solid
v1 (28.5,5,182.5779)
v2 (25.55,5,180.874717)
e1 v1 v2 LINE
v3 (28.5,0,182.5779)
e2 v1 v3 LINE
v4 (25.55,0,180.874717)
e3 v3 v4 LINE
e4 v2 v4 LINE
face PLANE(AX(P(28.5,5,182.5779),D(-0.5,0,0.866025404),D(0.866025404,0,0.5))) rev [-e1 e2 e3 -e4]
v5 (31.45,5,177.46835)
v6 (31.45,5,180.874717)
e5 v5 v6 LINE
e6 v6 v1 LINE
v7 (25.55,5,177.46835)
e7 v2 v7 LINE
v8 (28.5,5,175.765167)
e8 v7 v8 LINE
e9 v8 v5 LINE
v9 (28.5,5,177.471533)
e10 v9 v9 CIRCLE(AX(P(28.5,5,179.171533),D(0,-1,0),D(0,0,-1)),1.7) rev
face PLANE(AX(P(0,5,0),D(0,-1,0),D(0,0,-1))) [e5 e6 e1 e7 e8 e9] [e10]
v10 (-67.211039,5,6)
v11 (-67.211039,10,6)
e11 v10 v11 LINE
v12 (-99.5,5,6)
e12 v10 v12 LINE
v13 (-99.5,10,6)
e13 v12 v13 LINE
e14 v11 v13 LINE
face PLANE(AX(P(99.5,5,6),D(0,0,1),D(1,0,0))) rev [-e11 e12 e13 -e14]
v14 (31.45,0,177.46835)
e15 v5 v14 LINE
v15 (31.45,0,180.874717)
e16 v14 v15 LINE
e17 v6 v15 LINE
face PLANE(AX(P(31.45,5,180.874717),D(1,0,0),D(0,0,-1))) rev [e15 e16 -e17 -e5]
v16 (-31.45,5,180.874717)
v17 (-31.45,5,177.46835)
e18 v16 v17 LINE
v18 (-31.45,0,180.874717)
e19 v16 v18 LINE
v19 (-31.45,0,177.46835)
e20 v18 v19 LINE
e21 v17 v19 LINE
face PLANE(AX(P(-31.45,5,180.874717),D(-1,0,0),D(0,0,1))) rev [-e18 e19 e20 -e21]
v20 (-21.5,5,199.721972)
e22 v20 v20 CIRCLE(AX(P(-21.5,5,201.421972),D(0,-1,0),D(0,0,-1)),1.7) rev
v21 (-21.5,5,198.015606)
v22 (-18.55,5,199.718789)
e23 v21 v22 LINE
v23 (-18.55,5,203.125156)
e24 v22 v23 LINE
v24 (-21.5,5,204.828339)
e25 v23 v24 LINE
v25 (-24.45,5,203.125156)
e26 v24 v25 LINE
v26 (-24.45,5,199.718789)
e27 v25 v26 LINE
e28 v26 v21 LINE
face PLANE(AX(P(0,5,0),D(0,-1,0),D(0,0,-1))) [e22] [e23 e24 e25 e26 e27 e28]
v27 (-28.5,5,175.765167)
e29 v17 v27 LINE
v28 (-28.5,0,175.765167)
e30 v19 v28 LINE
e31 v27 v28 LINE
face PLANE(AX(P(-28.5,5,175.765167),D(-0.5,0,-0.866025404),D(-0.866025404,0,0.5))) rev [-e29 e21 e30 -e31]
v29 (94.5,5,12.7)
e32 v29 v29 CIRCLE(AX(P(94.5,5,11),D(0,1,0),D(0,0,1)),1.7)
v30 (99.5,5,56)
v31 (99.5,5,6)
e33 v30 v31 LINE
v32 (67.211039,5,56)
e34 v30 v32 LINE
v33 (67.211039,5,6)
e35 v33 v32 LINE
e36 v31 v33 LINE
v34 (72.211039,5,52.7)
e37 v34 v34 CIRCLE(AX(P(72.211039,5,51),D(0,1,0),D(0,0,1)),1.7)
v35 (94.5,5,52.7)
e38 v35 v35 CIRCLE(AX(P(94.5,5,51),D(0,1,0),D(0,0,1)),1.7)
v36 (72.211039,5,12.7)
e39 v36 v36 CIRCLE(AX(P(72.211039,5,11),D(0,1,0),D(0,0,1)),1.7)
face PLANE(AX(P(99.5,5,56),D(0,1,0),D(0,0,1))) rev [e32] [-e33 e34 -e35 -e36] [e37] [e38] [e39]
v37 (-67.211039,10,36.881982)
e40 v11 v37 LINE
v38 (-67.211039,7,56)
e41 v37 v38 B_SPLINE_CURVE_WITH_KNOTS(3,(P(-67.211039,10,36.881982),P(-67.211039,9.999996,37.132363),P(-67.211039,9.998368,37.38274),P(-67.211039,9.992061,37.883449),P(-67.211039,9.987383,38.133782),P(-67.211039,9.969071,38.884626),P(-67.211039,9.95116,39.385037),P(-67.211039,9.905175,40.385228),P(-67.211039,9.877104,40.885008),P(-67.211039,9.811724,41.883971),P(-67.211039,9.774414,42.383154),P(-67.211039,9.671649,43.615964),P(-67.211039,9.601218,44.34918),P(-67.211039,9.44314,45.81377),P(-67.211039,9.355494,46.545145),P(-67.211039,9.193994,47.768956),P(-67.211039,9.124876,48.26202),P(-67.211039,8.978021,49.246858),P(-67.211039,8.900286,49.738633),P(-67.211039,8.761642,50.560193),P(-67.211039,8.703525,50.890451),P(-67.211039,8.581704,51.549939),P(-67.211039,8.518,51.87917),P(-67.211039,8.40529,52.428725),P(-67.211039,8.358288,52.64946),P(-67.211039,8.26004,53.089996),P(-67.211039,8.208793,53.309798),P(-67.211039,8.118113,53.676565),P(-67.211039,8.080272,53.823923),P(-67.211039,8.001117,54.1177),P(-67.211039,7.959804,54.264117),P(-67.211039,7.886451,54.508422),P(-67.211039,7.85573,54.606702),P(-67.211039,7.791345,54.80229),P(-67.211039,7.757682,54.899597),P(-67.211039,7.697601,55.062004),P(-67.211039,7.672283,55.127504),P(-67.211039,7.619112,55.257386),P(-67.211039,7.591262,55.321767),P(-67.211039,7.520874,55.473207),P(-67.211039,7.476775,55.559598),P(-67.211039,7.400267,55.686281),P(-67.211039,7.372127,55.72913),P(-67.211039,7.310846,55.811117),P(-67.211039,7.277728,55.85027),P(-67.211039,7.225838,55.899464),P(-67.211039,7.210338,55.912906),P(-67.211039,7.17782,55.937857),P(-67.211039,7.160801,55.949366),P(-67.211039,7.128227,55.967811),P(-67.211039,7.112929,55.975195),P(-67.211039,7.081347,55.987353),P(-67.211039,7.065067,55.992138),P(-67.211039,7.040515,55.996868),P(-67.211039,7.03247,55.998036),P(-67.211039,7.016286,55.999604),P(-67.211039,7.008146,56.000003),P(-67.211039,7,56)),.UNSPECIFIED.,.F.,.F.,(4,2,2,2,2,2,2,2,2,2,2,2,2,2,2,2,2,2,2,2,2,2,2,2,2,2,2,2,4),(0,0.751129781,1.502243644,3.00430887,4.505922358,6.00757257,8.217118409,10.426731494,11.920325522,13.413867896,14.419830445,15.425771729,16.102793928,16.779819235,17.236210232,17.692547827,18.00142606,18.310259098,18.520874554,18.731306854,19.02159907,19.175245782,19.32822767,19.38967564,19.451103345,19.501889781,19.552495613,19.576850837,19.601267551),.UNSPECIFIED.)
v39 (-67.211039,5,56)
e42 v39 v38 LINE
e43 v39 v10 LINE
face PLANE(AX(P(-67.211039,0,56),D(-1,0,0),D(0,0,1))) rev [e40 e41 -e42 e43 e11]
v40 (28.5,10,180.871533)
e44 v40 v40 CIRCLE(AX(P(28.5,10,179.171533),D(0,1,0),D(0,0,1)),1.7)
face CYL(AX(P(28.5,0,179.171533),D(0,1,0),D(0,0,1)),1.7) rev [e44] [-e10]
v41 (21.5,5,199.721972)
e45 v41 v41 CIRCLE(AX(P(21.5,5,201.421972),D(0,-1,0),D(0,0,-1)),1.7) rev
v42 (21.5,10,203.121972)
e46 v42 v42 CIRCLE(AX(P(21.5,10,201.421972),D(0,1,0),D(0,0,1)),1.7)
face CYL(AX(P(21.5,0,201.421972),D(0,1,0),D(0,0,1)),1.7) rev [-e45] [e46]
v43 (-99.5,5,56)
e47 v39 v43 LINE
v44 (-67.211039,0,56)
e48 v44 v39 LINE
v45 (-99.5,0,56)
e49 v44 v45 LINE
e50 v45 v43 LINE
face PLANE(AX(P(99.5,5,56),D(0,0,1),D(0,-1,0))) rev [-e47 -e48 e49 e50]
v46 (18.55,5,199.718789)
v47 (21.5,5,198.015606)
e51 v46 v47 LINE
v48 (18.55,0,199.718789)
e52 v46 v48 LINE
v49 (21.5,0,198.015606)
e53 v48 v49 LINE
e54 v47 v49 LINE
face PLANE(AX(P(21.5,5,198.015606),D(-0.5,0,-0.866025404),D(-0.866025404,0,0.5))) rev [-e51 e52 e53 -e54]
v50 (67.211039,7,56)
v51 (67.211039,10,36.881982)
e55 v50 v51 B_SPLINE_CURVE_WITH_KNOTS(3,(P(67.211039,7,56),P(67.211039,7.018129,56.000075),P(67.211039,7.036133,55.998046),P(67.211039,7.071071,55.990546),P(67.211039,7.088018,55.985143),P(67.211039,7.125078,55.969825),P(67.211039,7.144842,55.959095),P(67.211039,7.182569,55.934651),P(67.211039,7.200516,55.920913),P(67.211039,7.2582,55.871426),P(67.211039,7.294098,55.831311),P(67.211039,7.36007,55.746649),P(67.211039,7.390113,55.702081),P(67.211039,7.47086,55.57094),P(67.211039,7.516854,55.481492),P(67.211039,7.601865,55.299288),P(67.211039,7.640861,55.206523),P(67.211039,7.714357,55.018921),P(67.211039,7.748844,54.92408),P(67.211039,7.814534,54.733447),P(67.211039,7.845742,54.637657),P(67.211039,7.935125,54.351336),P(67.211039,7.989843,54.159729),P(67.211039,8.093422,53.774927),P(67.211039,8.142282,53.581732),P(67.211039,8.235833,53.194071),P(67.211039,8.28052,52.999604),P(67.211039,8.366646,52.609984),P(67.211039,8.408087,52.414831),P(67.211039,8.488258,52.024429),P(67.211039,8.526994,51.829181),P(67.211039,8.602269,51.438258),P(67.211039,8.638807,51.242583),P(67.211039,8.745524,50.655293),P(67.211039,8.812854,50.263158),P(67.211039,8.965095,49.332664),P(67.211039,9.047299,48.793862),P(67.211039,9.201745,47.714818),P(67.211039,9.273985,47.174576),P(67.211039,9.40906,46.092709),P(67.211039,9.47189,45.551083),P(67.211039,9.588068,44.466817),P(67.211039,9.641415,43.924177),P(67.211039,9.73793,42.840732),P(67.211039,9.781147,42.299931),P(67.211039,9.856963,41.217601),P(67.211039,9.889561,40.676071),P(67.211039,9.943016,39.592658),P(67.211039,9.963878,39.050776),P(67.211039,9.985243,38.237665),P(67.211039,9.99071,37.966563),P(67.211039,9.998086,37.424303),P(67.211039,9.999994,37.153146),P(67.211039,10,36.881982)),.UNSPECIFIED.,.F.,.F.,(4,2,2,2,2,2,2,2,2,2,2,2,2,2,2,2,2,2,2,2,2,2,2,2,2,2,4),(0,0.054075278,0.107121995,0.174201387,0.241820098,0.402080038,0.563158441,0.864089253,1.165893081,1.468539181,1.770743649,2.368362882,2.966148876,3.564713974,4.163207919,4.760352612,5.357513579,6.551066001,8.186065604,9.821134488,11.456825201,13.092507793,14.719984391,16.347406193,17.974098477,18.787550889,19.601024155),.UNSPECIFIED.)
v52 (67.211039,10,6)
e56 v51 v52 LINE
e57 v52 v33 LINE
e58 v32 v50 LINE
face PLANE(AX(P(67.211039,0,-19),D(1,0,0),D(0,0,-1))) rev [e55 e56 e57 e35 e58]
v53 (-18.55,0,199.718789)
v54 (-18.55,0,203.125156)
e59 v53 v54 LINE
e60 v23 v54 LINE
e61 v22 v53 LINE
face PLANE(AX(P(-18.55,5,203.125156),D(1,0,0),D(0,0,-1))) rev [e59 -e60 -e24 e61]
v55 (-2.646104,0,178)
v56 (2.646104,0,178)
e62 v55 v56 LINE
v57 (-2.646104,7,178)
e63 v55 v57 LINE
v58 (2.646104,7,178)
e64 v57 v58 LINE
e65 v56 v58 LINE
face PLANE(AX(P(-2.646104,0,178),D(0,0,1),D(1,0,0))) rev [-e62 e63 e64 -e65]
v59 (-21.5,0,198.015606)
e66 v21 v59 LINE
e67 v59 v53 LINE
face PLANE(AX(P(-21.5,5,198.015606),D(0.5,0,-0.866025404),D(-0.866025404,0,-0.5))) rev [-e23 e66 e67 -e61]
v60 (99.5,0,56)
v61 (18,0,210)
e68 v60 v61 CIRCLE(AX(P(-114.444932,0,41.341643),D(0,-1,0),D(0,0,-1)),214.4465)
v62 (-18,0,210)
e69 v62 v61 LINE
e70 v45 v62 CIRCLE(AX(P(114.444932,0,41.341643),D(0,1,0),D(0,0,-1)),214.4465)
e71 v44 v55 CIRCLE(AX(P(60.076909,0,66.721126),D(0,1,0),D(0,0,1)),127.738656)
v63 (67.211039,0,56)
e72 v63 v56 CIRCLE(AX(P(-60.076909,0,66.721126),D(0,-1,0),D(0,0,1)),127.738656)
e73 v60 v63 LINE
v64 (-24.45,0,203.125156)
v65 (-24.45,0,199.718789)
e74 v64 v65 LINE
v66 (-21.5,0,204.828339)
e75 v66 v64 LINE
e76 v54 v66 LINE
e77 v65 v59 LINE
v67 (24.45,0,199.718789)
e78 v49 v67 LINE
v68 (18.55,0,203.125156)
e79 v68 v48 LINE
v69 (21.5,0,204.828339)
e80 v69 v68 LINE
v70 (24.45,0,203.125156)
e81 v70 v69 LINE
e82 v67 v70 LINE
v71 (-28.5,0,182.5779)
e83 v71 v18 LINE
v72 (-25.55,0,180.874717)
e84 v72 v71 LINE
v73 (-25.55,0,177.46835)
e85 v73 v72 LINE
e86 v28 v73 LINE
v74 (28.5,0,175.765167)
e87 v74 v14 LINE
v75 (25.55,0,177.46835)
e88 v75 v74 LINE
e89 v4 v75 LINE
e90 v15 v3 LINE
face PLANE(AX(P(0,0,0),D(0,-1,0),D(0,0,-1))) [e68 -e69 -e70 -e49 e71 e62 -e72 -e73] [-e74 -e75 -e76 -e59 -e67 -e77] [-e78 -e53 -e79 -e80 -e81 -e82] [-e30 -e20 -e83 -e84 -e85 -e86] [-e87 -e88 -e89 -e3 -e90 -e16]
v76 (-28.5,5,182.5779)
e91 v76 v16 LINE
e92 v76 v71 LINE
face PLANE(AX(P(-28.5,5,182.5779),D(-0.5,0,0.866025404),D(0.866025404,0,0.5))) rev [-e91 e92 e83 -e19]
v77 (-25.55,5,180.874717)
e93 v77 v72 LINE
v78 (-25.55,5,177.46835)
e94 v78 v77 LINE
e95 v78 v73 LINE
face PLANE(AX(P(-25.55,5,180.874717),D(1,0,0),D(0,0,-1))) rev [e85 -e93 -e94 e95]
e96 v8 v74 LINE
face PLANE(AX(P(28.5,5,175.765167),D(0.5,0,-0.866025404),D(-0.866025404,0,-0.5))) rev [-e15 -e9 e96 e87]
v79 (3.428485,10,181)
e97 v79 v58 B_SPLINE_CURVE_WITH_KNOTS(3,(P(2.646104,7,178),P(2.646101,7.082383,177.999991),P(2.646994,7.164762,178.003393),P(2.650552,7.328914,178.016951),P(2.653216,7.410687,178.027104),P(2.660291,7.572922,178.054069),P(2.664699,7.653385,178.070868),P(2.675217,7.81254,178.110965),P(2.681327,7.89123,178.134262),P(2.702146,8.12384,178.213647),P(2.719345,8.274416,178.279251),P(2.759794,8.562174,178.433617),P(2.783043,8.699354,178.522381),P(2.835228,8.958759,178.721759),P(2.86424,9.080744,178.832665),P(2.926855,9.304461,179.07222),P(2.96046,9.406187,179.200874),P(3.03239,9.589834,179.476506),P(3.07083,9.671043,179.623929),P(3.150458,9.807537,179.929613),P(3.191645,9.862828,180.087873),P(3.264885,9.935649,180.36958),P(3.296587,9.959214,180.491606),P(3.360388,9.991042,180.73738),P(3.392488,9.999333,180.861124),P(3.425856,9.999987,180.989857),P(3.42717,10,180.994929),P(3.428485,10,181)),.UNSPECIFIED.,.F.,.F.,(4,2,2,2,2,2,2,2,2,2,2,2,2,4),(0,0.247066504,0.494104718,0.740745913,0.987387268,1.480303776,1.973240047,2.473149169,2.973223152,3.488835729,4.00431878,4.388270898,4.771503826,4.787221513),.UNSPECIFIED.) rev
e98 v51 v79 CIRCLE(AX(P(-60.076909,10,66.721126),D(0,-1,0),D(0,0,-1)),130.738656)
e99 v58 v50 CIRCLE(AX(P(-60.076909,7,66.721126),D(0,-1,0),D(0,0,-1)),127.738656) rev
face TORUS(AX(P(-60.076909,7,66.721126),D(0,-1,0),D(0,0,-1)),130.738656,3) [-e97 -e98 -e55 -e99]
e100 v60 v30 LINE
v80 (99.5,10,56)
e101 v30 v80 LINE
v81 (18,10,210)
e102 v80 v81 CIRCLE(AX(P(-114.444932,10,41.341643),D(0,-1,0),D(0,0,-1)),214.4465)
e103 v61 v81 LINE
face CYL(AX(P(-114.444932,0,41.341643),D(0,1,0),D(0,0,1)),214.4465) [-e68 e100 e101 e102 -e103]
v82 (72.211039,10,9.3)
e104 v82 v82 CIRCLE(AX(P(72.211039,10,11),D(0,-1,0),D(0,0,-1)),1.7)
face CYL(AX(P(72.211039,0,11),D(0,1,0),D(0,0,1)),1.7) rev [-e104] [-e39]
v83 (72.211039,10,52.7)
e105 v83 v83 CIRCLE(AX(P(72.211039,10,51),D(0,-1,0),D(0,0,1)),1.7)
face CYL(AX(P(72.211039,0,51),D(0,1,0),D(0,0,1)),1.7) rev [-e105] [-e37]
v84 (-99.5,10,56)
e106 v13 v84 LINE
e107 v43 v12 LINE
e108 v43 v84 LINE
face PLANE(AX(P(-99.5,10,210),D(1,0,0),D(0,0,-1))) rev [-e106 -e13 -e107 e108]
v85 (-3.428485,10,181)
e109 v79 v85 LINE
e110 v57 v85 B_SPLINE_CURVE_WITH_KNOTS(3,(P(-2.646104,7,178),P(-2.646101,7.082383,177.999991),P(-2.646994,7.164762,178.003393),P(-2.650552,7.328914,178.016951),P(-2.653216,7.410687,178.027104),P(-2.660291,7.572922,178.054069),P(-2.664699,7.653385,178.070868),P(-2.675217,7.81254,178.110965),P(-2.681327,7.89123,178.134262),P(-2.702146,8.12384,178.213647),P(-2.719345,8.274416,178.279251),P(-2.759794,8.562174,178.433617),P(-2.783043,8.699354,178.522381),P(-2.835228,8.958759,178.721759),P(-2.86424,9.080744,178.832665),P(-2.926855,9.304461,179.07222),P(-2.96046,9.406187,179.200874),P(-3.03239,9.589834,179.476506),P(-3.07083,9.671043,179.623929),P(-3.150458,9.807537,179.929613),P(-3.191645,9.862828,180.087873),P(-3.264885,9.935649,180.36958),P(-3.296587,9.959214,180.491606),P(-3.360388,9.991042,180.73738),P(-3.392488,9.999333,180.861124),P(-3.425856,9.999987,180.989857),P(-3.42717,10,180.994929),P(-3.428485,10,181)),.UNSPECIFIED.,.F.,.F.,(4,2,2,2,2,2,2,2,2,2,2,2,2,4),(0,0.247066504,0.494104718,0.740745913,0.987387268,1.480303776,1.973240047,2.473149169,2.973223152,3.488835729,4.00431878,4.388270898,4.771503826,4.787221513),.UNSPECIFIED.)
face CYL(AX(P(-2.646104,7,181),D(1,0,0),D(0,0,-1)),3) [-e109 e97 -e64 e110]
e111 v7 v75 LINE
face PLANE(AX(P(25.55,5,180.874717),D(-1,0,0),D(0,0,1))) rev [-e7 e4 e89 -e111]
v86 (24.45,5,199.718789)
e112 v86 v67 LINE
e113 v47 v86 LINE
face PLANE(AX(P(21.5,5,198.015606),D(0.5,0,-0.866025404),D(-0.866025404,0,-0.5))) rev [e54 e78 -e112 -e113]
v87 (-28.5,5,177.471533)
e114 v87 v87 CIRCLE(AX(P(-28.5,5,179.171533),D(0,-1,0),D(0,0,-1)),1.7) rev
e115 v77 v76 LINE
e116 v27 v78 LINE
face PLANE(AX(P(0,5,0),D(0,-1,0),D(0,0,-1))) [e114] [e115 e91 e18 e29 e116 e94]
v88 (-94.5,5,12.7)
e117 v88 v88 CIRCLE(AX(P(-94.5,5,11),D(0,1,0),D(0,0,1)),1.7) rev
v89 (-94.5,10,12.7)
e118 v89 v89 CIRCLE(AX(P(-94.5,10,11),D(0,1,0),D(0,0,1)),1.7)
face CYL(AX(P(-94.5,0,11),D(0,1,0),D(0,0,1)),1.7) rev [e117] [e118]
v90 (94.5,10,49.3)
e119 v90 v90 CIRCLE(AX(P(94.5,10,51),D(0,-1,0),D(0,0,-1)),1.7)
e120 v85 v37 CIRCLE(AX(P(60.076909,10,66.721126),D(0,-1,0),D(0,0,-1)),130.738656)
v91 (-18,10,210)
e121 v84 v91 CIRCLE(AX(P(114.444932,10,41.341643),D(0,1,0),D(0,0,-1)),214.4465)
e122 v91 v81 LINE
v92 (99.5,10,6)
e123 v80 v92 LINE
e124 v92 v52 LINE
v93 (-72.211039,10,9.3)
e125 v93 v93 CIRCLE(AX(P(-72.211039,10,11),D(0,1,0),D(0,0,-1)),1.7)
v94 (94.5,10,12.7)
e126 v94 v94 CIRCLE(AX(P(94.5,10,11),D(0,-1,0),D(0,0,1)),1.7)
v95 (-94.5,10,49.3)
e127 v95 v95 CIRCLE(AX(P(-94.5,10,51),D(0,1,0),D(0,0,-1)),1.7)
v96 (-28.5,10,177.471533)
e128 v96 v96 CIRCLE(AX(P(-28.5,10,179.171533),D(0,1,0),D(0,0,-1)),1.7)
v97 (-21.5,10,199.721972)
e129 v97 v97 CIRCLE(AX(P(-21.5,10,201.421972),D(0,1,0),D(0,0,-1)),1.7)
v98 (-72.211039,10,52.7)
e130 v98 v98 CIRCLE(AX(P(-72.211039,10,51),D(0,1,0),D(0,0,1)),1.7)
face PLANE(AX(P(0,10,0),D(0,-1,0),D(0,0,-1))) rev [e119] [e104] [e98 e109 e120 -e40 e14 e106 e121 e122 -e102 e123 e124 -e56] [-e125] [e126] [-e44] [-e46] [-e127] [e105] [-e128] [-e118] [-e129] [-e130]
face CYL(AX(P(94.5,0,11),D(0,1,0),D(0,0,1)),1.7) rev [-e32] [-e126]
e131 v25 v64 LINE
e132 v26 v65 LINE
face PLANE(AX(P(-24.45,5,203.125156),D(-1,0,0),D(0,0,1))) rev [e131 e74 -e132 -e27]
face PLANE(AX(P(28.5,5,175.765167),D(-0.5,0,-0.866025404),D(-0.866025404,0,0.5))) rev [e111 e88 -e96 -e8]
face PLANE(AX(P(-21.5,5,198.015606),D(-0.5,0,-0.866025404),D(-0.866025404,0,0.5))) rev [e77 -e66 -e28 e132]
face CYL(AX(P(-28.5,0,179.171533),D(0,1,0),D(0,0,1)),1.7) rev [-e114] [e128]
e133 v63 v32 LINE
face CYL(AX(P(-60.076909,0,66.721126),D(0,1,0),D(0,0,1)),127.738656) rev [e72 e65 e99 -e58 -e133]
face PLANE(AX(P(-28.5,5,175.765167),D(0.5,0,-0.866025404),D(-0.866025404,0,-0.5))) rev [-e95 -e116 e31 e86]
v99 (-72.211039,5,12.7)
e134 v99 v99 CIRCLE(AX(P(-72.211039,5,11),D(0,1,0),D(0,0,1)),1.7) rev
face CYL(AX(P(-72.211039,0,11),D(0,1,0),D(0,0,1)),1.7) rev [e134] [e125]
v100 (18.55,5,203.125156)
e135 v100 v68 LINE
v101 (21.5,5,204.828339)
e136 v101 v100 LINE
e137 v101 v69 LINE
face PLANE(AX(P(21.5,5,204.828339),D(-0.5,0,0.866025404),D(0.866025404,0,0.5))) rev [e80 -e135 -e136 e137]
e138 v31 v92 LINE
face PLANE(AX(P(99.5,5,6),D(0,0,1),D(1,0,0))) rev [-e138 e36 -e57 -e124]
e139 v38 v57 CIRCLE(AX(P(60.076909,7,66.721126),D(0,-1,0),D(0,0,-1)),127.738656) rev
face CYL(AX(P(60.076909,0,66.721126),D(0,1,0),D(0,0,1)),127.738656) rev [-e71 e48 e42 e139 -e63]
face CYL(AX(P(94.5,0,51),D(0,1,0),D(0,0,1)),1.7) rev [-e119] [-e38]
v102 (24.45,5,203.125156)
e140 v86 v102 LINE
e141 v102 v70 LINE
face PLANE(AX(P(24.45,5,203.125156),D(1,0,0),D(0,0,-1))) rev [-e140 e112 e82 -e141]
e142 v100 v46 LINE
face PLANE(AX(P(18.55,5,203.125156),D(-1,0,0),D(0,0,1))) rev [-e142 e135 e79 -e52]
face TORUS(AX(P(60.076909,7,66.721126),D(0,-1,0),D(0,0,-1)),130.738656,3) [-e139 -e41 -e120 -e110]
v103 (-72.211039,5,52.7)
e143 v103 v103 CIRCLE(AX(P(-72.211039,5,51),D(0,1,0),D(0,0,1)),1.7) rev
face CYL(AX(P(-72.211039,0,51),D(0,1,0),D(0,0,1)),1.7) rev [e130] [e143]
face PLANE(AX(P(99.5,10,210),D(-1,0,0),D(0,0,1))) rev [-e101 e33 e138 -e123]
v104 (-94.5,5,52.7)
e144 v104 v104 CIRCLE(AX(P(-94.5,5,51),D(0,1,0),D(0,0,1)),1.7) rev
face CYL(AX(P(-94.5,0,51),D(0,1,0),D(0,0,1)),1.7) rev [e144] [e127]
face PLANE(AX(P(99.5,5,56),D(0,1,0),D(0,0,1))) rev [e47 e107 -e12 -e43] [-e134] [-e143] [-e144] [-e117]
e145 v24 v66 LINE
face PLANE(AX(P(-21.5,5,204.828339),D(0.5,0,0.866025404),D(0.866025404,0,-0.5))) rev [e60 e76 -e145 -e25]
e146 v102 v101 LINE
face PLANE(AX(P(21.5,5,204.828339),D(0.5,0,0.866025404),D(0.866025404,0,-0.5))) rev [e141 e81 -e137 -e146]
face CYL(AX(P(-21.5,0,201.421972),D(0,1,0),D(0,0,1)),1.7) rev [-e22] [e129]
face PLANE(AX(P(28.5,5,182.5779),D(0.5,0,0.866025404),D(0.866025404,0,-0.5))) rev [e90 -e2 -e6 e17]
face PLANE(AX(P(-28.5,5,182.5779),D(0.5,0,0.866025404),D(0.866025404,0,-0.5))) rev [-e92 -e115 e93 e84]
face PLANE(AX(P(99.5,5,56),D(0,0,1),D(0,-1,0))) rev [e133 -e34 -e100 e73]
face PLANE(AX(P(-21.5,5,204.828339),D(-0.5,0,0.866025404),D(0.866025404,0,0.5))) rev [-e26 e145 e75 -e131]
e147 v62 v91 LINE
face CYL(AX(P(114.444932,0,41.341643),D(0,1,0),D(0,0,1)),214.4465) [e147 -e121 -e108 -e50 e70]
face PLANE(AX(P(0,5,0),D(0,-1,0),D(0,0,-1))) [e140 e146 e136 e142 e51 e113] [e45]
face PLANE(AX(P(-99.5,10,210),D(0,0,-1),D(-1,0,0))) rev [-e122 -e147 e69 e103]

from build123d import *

# Parameters (mm, degrees)
SKIZZE1_W                        = 199
SKIZZE1_H                        = 420
AUFSATZ_LINEAR_AUSTRAGEN1_DEPTH  = 10
SKIZZE5_W                        = 199
SKIZZE5_H                        = 85
SCHNITT_LINEAR_AUSTRAGEN2_DEPTH  = 10
SKIZZE20_R                       = 1.7
SCHNITT_LINEAR_AUSTRAGEN12_DEPTH = 233.594604409
SKIZZE21_W                       = 134.422077922
SKIZZE21_H                       = 75
SCHNITT_LINEAR_AUSTRAGEN13_DEPTH = 233.594604409
SCHNITT_LINEAR_AUSTRAGEN14_DEPTH = 233.594604409
AUFSATZ_LINEAR_AUSTRAGEN6_DEPTH  = 10
SKIZZE25_R                       = 1.7
SCHNITT_LINEAR_AUSTRAGEN15_DEPTH = 233.594604409
SCHNITT_LINEAR_AUSTRAGEN16_DEPTH = 290.484023739
VERRUNDUNG1_R                    = 3
SKIZZE27_R                       = 1.7
SCHNITT_LINEAR_AUSTRAGEN17_DEPTH = 233.594604409
SCHNITT_LINEAR_AUSTRAGEN18_DEPTH = 5


with BuildPart() as part:
    # Skizze1 → Aufsatz-Linear austragen1 (new body)
    with BuildSketch(Plane(origin=(0, 0, 0), x_dir=(1, 0, 0), z_dir=(0, 1, 0))):
        Rectangle(SKIZZE1_W, SKIZZE1_H)
    extrude(amount=AUFSATZ_LINEAR_AUSTRAGEN1_DEPTH)

    # Skizze5 → Schnitt-Linear austragen2 (cut)
    with BuildSketch(Plane(origin=(0, 10, 0), x_dir=(1, 0, 0), z_dir=(0, 1, 0))):
        Polygon((99.5, -210), (18, -210), (99.5, -56), align=None)
        Polygon((-18, -210), (-99.5, -56), (-99.5, -210), align=None)
        with Locations((0, 167.5)):
            Rectangle(SKIZZE5_W, SKIZZE5_H)
        Polygon((67.211038961, -56), (-67.211038961, -56), (-2.646103896, -178), (2.646103896, -178), align=None)
    extrude(amount=-SCHNITT_LINEAR_AUSTRAGEN2_DEPTH, mode=Mode.SUBTRACT)

    # Skizze20 → Schnitt-Linear austragen12 (cut, through all)
    with BuildSketch(Plane(origin=(0, 10, 0), x_dir=(1, 0, 0), z_dir=(0, 1, 0))):
        with Locations(Location((90.5, 119.52, 0), (0, 0, 270))):
            Circle(SKIZZE20_R)
        with Locations(Location((48.5, 119.52, 0), (0, 0, 270))):
            Circle(SKIZZE20_R)
        with Locations(Location((-48.5, 119.52, 0), (0, 0, 90))):
            Circle(SKIZZE20_R)
        with Locations(Location((-90.5, 119.52, 0), (0, 0, 90))):
            Circle(SKIZZE20_R)
        with Locations(Location((87, 43.82, 0), (0, 0, 270))):
            Circle(SKIZZE20_R)
        with Locations(Location((52, 43.82, 0), (0, 0, 270))):
            Circle(SKIZZE20_R)
        with Locations(Location((-87, 43.82, 0), (0, 0, 90))):
            Circle(SKIZZE20_R)
        with Locations(Location((-52, 43.82, 0), (0, 0, 90))):
            Circle(SKIZZE20_R)
    extrude(amount=-SCHNITT_LINEAR_AUSTRAGEN12_DEPTH, mode=Mode.SUBTRACT)

    # Skizze21 → Schnitt-Linear austragen13 (cut, through all)
    with BuildSketch(Plane(origin=(0, 10, 0), x_dir=(1, 0, 0), z_dir=(0, 1, 0))):
        with Locations((0, -18.5)):
            Rectangle(SKIZZE21_W, SKIZZE21_H)
    extrude(amount=-SCHNITT_LINEAR_AUSTRAGEN13_DEPTH, mode=Mode.SUBTRACT)

    # Skizze22 → Schnitt-Linear austragen14 (cut, through all)
    with BuildSketch(Plane(origin=(0, 10, 0), x_dir=(1, 0, 0), z_dir=(0, 1, 0))):
        with BuildLine():
            Line((-67.211038961, -56), (-2.646103896, -178))
            ThreePointArc((-2.646103896, -178), (-52.825886854, -126.471631215), (-67.211038961, -56))
        make_face()
    schnitt_linear_austragen14 = extrude(amount=-SCHNITT_LINEAR_AUSTRAGEN14_DEPTH, mode=Mode.SUBTRACT)

    # Skizze23 → Aufsatz-Linear austragen6 (add)
    with BuildSketch(Plane(origin=(0, 10, 0), x_dir=(1, 0, 0), z_dir=(0, 1, 0))):
        with BuildLine():
            Line((-99.5, -56), (-18, -210))
            ThreePointArc((-18, -210), (-75.095260266, -141.650251374), (-99.5, -56))
        make_face()
    aufsatz_linear_austragen6 = extrude(amount=-AUFSATZ_LINEAR_AUSTRAGEN6_DEPTH)

    # Spiegeln2: Schnitt-Linear austragen14, Aufsatz-Linear austragen6 across plane
    add(schnitt_linear_austragen14.mirror(Plane(origin=(0, 0, 0), x_dir=(0, 0, 1), z_dir=(1, 0, 0))), mode=Mode.SUBTRACT)
    add(aufsatz_linear_austragen6.mirror(Plane(origin=(0, 0, 0), x_dir=(0, 0, 1), z_dir=(1, 0, 0))))

    # Skizze25 → Schnitt-Linear austragen15 (cut, through all)
    with BuildSketch(Plane(origin=(0, 10, 0), x_dir=(1, 0, 0), z_dir=(0, 1, 0))):
        with Locations(Location((-94.5, -11, 0), (0, 0, 270))):
            Circle(SKIZZE25_R)
        with Locations(Location((-72.211038961, -11, 0), (0, 0, 90))):
            Circle(SKIZZE25_R)
        with Locations(Location((-72.211038961, -51, 0), (0, 0, 270))):
            Circle(SKIZZE25_R)
        with Locations(Location((-94.5, -51, 0), (0, 0, 90))):
            Circle(SKIZZE25_R)
    schnitt_linear_austragen15 = extrude(amount=-SCHNITT_LINEAR_AUSTRAGEN15_DEPTH, mode=Mode.SUBTRACT)

    # Spiegeln3: Schnitt-Linear austragen15 across plane
    add(schnitt_linear_austragen15.mirror(Plane(origin=(0, 0, 0), x_dir=(0, 0, 1), z_dir=(1, 0, 0))), mode=Mode.SUBTRACT)

    # Skizze26 → Schnitt-Linear austragen16 (cut, through all)
    with BuildSketch(Plane.ZY.offset(99.5)):
        Polygon((56, 5), (56, 0), (4.196805737, -14.401746423), (-137.707729511, -14.401746423), (-137.707729511, 19.508660812), (5.012761814, 19.508660812), (6, 10), (6, 5), align=None)
    extrude(amount=-SCHNITT_LINEAR_AUSTRAGEN16_DEPTH, mode=Mode.SUBTRACT)

    # Verrundung1
    # the kernel refuses this fillet: 3 mm, written as the material it takes off along each edge
    with BuildSketch(Plane(origin=(60.076908998, 10, 66.721125619), x_dir=(-0.4390500946900349, 0, 0.8984625837243705), z_dir=(0.8984625837243705, 0, 0.4390500946900349))) as verrundung1_piece_1_section:
        with BuildLine():
            CenterArc((127.738655974 + VERRUNDUNG1_R, VERRUNDUNG1_R), VERRUNDUNG1_R, 180, 90)
            Line((127.738655974, VERRUNDUNG1_R), (127.738655974, 0))
            Line((127.738655974, 0), (127.738655974 + VERRUNDUNG1_R, 0))
        make_face()
    verrundung1_piece_1 = revolve(axis=Axis((60.076908998, 10, 66.721125619), (0, -1, 0)), revolution_arc=78.865488706, mode=Mode.PRIVATE)
    verrundung1_piece_1 = split(verrundung1_piece_1, bisect_by=Plane(origin=(60.076908998, 10, 178), z_dir=(0, 0, -1)), keep=Keep.TOP, mode=Mode.PRIVATE)
    add(verrundung1_piece_1, mode=Mode.SUBTRACT)
    with BuildSketch(Plane(origin=(-60.076908998, 10, 66.721125619), x_dir=(0.4390500946900349, 0, 0.8984625837243705), z_dir=(-0.8984625837243705, 0, 0.4390500946900349))) as verrundung1_piece_2_section:
        with BuildLine():
            CenterArc((127.738655974 + VERRUNDUNG1_R, -VERRUNDUNG1_R), VERRUNDUNG1_R, 90, 90)
            Line((127.738655974, -VERRUNDUNG1_R), (127.738655974, 0))
            Line((127.738655974, 0), (127.738655974 + VERRUNDUNG1_R, 0))
        make_face()
    verrundung1_piece_2 = revolve(axis=Axis((-60.076908998, 10, 66.721125619), (0, 1, 0)), revolution_arc=78.865488706, mode=Mode.PRIVATE)
    verrundung1_piece_2 = split(verrundung1_piece_2, bisect_by=Plane(origin=(-60.076908998, 10, 178), z_dir=(0, 0, -1)), keep=Keep.TOP, mode=Mode.PRIVATE)
    add(verrundung1_piece_2, mode=Mode.SUBTRACT)
    with BuildSketch(Plane(origin=(-10.146103896, 10, 178), x_dir=(0, 0, 1), z_dir=(1, 0, 0))) as verrundung1_piece_3_section:
        with BuildLine():
            CenterArc((VERRUNDUNG1_R, VERRUNDUNG1_R), VERRUNDUNG1_R, 180, 90)
            Line((0, VERRUNDUNG1_R), (0, 0))
            Line((0, 0), (VERRUNDUNG1_R, 0))
        make_face()
    verrundung1_piece_3 = extrude(amount=20.292207792, mode=Mode.PRIVATE)
    verrundung1_piece_3 = verrundung1_piece_3 & Plane(origin=(60.076908998, 10, 66.721125619), x_dir=(-0.4910260908528423, 0, 0.8711448663120137), z_dir=(0, 1, 0)) * Cylinder(127.738655974, 53, mode=Mode.PRIVATE)
    verrundung1_piece_3 = verrundung1_piece_3 & Plane(origin=(-60.076908998, 10, 66.721125619), x_dir=(0.4910260908528423, 0, 0.8711448663120137), z_dir=(0, 1, 0)) * Cylinder(127.738655974, 53, mode=Mode.PRIVATE)
    add(verrundung1_piece_3, mode=Mode.SUBTRACT)
    with BuildSketch(Plane(origin=(-10.146103896, 10, 178), x_dir=(0, 0, 1), z_dir=(1, 0, 0))) as verrundung1_piece_4_section:
        with BuildLine():
            CenterArc((VERRUNDUNG1_R, VERRUNDUNG1_R), VERRUNDUNG1_R, 180, 90)
            Line((0, VERRUNDUNG1_R), (0, 0))
            Line((0, 0), (VERRUNDUNG1_R, 0))
        make_face()
    verrundung1_piece_4 = extrude(amount=20.292207792, mode=Mode.PRIVATE)
    verrundung1_piece_4 = verrundung1_piece_4 - Plane(origin=(60.076908998, 10, 66.721125619), x_dir=(-0.4910260908528423, 0, 0.8711448663120137), z_dir=(0, 1, 0)) * Cylinder(127.738655974, 53, mode=Mode.PRIVATE)
    verrundung1_piece_4 = verrundung1_piece_4 - Plane(origin=(-60.076908998, 10, 66.721125619), x_dir=(0.4910260908528423, 0, 0.8711448663120137), z_dir=(0, 1, 0)) * Cylinder(127.738655974, 53, mode=Mode.PRIVATE)
    add(verrundung1_piece_4, mode=Mode.SUBTRACT)
    with BuildSketch(Plane(origin=(60.076908998, 10, 66.721125619), x_dir=(-0.4390500946900349, 0, 0.8984625837243705), z_dir=(0.8984625837243705, 0, 0.4390500946900349))) as verrundung1_piece_5a_section:
        with BuildLine():
            CenterArc((127.738655974 + VERRUNDUNG1_R, VERRUNDUNG1_R), VERRUNDUNG1_R, 180, 90)
            Line((127.738655974, VERRUNDUNG1_R), (127.738655974, 0))
            Line((127.738655974, 0), (127.738655974 + VERRUNDUNG1_R, 0))
        make_face()
    verrundung1_piece_5a = revolve(axis=Axis((60.076908998, 10, 66.721125619), (0, -1, 0)), revolution_arc=78.865488706, mode=Mode.PRIVATE)
    verrundung1_piece_5a = split(verrundung1_piece_5a, bisect_by=Plane(origin=(60.076908998, 10, 178), z_dir=(0, 0, 1)), keep=Keep.TOP, mode=Mode.PRIVATE)
    with BuildSketch(Plane(origin=(-10.146103896, 10, 178), x_dir=(0, 0, 1), z_dir=(1, 0, 0))) as verrundung1_piece_5b_section:
        with BuildLine():
            CenterArc((VERRUNDUNG1_R, VERRUNDUNG1_R), VERRUNDUNG1_R, 180, 90)
            Line((0, VERRUNDUNG1_R), (0, 0))
            Line((0, 0), (VERRUNDUNG1_R, 0))
        make_face()
    verrundung1_piece_5b = extrude(amount=20.292207792, mode=Mode.PRIVATE)
    verrundung1_piece_5b = verrundung1_piece_5b - Plane(origin=(60.076908998, 10, 66.721125619), x_dir=(-0.4910260908528423, 0, 0.8711448663120137), z_dir=(0, 1, 0)) * Cylinder(127.738655974, 53, mode=Mode.PRIVATE)
    verrundung1_piece_5b = verrundung1_piece_5b & Plane(origin=(-60.076908998, 10, 66.721125619), x_dir=(0.4910260908528423, 0, 0.8711448663120137), z_dir=(0, 1, 0)) * Cylinder(127.738655974, 53, mode=Mode.PRIVATE)
    verrundung1_piece_5 = verrundung1_piece_5a & verrundung1_piece_5b
    add(verrundung1_piece_5, mode=Mode.SUBTRACT)
    with BuildSketch(Plane(origin=(-10.146103896, 10, 178), x_dir=(0, 0, 1), z_dir=(1, 0, 0))) as verrundung1_piece_6a_section:
        with BuildLine():
            CenterArc((VERRUNDUNG1_R, VERRUNDUNG1_R), VERRUNDUNG1_R, 180, 90)
            Line((0, VERRUNDUNG1_R), (0, 0))
            Line((0, 0), (VERRUNDUNG1_R, 0))
        make_face()
    verrundung1_piece_6a = extrude(amount=20.292207792, mode=Mode.PRIVATE)
    verrundung1_piece_6a = verrundung1_piece_6a & Plane(origin=(60.076908998, 10, 66.721125619), x_dir=(-0.4910260908528423, 0, 0.8711448663120137), z_dir=(0, 1, 0)) * Cylinder(127.738655974, 53, mode=Mode.PRIVATE)
    verrundung1_piece_6a = verrundung1_piece_6a - Plane(origin=(-60.076908998, 10, 66.721125619), x_dir=(0.4910260908528423, 0, 0.8711448663120137), z_dir=(0, 1, 0)) * Cylinder(127.738655974, 53, mode=Mode.PRIVATE)
    with BuildSketch(Plane(origin=(-60.076908998, 10, 66.721125619), x_dir=(0.4390500946900349, 0, 0.8984625837243705), z_dir=(-0.8984625837243705, 0, 0.4390500946900349))) as verrundung1_piece_6b_section:
        with BuildLine():
            CenterArc((127.738655974 + VERRUNDUNG1_R, -VERRUNDUNG1_R), VERRUNDUNG1_R, 90, 90)
            Line((127.738655974, -VERRUNDUNG1_R), (127.738655974, 0))
            Line((127.738655974, 0), (127.738655974 + VERRUNDUNG1_R, 0))
        make_face()
    verrundung1_piece_6b = revolve(axis=Axis((-60.076908998, 10, 66.721125619), (0, 1, 0)), revolution_arc=78.865488706, mode=Mode.PRIVATE)
    verrundung1_piece_6b = split(verrundung1_piece_6b, bisect_by=Plane(origin=(-60.076908998, 10, 178), z_dir=(0, 0, 1)), keep=Keep.TOP, mode=Mode.PRIVATE)
    verrundung1_piece_6 = verrundung1_piece_6a & verrundung1_piece_6b
    add(verrundung1_piece_6, mode=Mode.SUBTRACT)

    # Skizze27 → Schnitt-Linear austragen17 (cut, through all)
    with BuildSketch(Plane(origin=(0, 10, 0), x_dir=(1, 0, 0), z_dir=(0, 1, 0))):
        with Locations(Location((28.5, -179.171533214, 0), (0, 0, 270))):
            Circle(SKIZZE27_R)
        with Locations(Location((21.5, -201.421972318, 0), (0, 0, 270))):
            Circle(SKIZZE27_R)
        with Locations(Location((-21.5, -201.421972318, 0), (0, 0, 90))):
            Circle(SKIZZE27_R)
        with Locations(Location((-28.5, -179.171533214, 0), (0, 0, 90))):
            Circle(SKIZZE27_R)
    extrude(amount=-SCHNITT_LINEAR_AUSTRAGEN17_DEPTH, mode=Mode.SUBTRACT)

    # Skizze28 → Schnitt-Linear austragen18 (cut)
    with BuildSketch(Plane.XZ):
        Polygon((21.5, 204.828338906), (24.45, 203.125155612), (24.45, 199.718789024), (21.5, 198.01560573), (18.55, 199.718789024), (18.55, 203.125155612), align=None)
        Polygon((28.5, 182.577899803), (31.45, 180.874716508), (31.45, 177.46834992), (28.5, 175.765166626), (25.55, 177.46834992), (25.55, 180.874716508), align=None)
        Polygon((-28.5, 182.577899803), (-25.55, 180.874716508), (-25.55, 177.46834992), (-28.5, 175.765166626), (-31.45, 177.46834992), (-31.45, 180.874716508), align=None)
        Polygon((-21.5, 204.828338906), (-18.55, 203.125155612), (-18.55, 199.718789024), (-21.5, 198.01560573), (-24.45, 199.718789024), (-24.45, 203.125155612), align=None)
    extrude(amount=-SCHNITT_LINEAR_AUSTRAGEN18_DEPTH, mode=Mode.SUBTRACT)


solid = part.part
